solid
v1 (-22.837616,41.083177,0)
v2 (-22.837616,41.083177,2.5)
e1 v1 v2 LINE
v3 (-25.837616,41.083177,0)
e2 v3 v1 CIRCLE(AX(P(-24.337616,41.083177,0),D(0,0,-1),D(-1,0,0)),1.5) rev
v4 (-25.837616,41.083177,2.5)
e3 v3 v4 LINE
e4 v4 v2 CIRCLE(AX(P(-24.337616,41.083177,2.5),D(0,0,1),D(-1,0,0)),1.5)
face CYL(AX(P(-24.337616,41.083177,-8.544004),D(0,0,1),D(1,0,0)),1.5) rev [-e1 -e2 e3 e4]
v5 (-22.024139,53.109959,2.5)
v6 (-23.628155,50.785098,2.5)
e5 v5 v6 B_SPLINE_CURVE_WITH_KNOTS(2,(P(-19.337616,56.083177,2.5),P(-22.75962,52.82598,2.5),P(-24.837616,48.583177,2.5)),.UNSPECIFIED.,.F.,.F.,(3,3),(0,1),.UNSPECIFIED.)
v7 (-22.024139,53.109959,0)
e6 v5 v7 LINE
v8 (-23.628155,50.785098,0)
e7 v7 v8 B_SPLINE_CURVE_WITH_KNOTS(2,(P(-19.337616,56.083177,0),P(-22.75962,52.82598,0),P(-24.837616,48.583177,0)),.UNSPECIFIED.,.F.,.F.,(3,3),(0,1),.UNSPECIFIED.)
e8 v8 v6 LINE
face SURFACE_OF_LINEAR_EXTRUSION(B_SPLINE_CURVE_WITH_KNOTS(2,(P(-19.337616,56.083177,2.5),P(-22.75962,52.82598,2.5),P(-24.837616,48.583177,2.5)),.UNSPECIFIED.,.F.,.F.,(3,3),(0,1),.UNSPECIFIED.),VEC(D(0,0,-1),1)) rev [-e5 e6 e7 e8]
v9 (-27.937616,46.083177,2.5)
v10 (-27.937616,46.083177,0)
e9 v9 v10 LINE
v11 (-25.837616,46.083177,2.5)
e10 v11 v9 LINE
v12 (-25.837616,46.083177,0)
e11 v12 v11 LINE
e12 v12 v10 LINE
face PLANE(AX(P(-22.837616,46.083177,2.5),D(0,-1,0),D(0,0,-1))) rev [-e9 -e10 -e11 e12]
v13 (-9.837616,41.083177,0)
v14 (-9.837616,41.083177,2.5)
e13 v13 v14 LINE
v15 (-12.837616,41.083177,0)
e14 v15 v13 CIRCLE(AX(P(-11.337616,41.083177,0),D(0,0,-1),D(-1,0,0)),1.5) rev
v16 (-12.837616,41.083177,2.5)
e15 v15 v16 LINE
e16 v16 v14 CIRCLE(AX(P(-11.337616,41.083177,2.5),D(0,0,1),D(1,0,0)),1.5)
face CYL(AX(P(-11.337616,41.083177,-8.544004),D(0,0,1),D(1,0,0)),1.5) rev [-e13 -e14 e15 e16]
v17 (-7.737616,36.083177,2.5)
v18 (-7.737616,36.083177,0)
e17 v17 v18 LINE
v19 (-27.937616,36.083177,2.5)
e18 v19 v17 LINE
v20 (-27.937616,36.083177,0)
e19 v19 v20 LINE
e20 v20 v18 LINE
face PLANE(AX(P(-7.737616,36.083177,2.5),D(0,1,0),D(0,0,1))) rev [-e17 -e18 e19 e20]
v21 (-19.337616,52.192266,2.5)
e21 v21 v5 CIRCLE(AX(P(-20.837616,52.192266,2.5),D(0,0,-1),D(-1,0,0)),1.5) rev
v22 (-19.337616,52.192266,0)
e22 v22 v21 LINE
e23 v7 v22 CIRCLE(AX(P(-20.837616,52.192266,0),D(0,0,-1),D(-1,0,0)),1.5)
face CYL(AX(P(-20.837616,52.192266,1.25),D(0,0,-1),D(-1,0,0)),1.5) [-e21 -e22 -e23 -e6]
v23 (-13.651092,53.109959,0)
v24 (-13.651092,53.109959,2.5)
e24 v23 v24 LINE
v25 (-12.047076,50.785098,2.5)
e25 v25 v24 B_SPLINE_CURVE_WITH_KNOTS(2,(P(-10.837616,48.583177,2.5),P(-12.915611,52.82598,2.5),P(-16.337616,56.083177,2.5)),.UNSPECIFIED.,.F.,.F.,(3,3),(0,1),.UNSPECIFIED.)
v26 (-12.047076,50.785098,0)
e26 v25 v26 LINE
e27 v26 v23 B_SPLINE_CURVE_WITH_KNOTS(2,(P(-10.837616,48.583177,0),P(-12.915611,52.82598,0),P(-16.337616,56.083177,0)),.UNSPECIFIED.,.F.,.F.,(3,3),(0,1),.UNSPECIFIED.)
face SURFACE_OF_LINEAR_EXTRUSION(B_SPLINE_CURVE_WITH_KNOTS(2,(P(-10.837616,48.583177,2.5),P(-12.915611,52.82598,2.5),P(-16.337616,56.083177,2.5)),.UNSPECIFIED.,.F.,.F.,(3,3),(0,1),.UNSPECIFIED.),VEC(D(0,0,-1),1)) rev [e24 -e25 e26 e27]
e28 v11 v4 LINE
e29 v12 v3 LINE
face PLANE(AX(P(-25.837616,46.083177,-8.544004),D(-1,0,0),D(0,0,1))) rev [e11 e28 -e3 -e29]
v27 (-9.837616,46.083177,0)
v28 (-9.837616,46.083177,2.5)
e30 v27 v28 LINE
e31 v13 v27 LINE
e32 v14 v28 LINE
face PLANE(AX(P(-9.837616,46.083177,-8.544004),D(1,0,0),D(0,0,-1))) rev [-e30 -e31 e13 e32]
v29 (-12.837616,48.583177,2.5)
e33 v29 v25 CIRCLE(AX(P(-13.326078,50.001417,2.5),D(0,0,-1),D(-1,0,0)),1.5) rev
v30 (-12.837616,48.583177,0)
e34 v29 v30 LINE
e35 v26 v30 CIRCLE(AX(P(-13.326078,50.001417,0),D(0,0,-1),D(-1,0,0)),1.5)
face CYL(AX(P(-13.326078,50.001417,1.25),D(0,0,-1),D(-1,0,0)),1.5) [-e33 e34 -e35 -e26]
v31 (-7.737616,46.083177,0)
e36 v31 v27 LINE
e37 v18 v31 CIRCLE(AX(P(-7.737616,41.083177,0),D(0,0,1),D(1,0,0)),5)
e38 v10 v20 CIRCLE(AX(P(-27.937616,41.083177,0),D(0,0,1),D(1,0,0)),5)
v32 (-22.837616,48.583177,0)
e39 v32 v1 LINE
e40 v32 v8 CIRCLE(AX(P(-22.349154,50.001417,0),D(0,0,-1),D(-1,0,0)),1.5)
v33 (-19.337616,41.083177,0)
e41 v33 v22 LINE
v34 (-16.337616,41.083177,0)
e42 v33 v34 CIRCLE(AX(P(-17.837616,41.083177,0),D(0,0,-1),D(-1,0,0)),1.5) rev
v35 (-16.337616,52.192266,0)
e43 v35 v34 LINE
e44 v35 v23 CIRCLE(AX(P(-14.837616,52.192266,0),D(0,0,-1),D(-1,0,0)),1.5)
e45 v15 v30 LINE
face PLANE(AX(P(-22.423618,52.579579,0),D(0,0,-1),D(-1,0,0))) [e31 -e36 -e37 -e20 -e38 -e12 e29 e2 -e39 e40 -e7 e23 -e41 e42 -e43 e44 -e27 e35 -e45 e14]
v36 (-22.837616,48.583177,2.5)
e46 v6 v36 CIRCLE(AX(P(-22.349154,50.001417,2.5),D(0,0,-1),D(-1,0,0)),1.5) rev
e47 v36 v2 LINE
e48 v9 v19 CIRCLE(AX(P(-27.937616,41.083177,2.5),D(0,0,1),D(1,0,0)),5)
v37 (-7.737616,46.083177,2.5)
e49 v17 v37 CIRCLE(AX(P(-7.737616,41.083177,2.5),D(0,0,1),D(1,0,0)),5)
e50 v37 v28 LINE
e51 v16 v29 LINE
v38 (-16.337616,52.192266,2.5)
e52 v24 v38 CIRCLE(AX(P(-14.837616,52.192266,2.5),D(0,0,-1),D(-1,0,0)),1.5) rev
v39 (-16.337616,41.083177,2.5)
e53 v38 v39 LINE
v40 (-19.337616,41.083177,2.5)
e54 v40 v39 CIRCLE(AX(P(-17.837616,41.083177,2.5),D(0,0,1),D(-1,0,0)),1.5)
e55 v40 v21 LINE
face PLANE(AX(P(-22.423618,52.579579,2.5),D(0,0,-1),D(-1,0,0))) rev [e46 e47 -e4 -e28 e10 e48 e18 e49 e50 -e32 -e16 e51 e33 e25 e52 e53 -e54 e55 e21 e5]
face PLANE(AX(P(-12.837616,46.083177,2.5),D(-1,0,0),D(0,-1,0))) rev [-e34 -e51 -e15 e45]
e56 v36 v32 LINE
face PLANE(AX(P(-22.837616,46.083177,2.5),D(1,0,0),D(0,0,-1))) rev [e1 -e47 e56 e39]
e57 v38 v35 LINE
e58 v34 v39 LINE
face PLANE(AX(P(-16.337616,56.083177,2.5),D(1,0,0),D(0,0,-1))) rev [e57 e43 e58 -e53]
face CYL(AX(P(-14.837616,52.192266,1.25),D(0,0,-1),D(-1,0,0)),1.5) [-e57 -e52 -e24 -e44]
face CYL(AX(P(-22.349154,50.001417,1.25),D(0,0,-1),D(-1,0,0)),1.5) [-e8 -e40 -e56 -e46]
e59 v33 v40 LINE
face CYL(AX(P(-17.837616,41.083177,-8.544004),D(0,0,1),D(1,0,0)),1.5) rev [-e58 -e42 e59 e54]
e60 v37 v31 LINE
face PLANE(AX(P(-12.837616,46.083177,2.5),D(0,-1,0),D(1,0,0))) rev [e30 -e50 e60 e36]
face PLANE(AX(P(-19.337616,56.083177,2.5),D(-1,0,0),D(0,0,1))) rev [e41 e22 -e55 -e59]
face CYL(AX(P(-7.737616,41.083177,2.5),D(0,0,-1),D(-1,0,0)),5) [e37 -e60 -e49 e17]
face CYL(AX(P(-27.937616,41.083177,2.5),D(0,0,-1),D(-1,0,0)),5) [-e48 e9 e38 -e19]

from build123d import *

# Parameters (mm, degrees)
BOSS_EXTRUDE1_DEPTH = 2.5
CUT_EXTRUDE1_START  = -2.5
CUT_EXTRUDE1_DEPTH  = 2.5
FILLET1_R           = 1.5
FILLET2_R           = 1.5


with BuildPart() as part:
    # Sketch1 → Boss-Extrude1 (new body)
    with BuildSketch(Plane.XY):
        with BuildLine():
            Line((-22.837615564, 46.083177434), (-27.937615564, 46.083177434))
            ThreePointArc((-27.937615564, 46.083177434), (-32.937615564, 41.083177434), (-27.937615564, 36.083177434))
            Line((-27.937615564, 36.083177434), (-7.737615564, 36.083177434))
            ThreePointArc((-7.737615564, 36.083177434), (-2.737615564, 41.083177434), (-7.737615564, 46.083177434))
            Line((-7.737615564, 46.083177434), (-12.837615564, 46.083177434))
            Line((-12.837615564, 46.083177434), (-12.837615564, 48.583177434))
            Line((-12.837615564, 48.583177434), (-10.837615564, 48.583177434))
            add(Edge.make_bspline(
                [(-16.337615564, 56.083177434), (-12.915611401, 52.825980487), (-10.837615564, 48.583177434)],
                knots=[0, 0, 0, 1, 1, 1], degree=2))
            Line((-16.337615564, 56.083177434), (-16.337615564, 46.083177434))
            ThreePointArc((-16.337615564, 46.083177434), (-17.837615564, 44.583177434), (-19.337615564, 46.083177434))
            Line((-19.337615564, 46.083177434), (-19.337615564, 56.083177434))
            add(Edge.make_bspline(
                [(-19.337615564, 56.083177434), (-22.759619727, 52.825980487), (-24.837615564, 48.583177434)],
                knots=[0, 0, 0, 1, 1, 1], degree=2))
            Line((-24.837615564, 48.583177434), (-22.837615564, 48.583177434))
            Line((-22.837615564, 48.583177434), (-22.837615564, 46.083177434))
        make_face()
    extrude(amount=BOSS_EXTRUDE1_DEPTH)

    # Sketch2 → Cut-Extrude1 (cut)
    with BuildSketch(Plane.XY.offset(2.5).offset(CUT_EXTRUDE1_START)):
        with BuildLine():
            Line((-9.837615564, 46.083177434), (-9.837615564, 41.083177434))
            ThreePointArc((-9.837615564, 41.083177434), (-11.337615564, 39.583177434), (-12.837615564, 41.083177434))
            Line((-12.837615564, 41.083177434), (-12.837615564, 46.083177434))
            ThreePointArc((-12.837615564, 46.083177434), (-11.337615564, 47.583177434), (-9.837615564, 46.083177434))
        make_face()
        with BuildLine():
            Line((-25.837615564, 46.083177434), (-25.837615564, 41.083177434))
            ThreePointArc((-25.837615564, 41.083177434), (-24.337615564, 39.583177434), (-22.837615564, 41.083177434))
            Line((-22.837615564, 41.083177434), (-22.837615564, 46.083177434))
            ThreePointArc((-22.837615564, 46.083177434), (-24.337615564, 47.583177434), (-25.837615564, 46.083177434))
        make_face()
        with BuildLine():
            Line((-19.337615564, 46.083177434), (-19.337615564, 41.083177434))
            ThreePointArc((-19.337615564, 41.083177434), (-17.837615564, 39.583177434), (-16.337615564, 41.083177434))
            Line((-16.337615564, 41.083177434), (-16.337615564, 46.083177434))
            ThreePointArc((-16.337615564, 46.083177434), (-17.837615564, 47.583177434), (-19.337615564, 46.083177434))
        make_face()
    extrude(amount=CUT_EXTRUDE1_DEPTH, mode=Mode.SUBTRACT)

    # Fillet1
    # the kernel refuses this fillet: 1.5 mm, written as the material it takes off along each edge
    with BuildSketch(Plane(origin=(-10.837615564, 48.583177434, -6.280550784), x_dir=(-1, 0, 0), z_dir=(0, 0, 1))) as fillet1_piece_1:
        with BuildLine():
            CenterArc((2.488462024, -1.418240054), FILLET1_R, 109.004435481, 102.492563124)
            Line((1.209460724, -2.201920903), (1.183880698, -2.21759452))
            ThreePointArc((1.183880698, -2.21759452), (0.552459457, -1.12966162), (-0.026942162, -0.013195451))
            Line((-0.026942162, -0.013195451), (0, 0.03))
            ThreePointArc((0, 0.03), (1, 0.03), (1.99023076, 0.028364801))
            Line((1.99023076, 0.028364801), (2, 0))
        make_face()
    extrude(amount=15.061101567, mode=Mode.SUBTRACT)
    with BuildSketch(Plane(origin=(-24.837615564, 48.583177434, -6.280550784), x_dir=(1, 0, 0), z_dir=(0, 0, 1))) as fillet1_piece_2:
        with BuildLine():
            CenterArc((2.488462024, 1.418240054), FILLET1_R, 148.503001395, 102.492563124)
            Line((1.209460724, 2.201920903), (1.183880698, 2.21759452))
            ThreePointArc((1.183880698, 2.21759452), (0.552459457, 1.12966162), (-0.026942162, 0.013195451))
            Line((-0.026942162, 0.013195451), (0, -0.03))
            ThreePointArc((0, -0.03), (1, -0.03), (1.99023076, -0.028364801))
            Line((1.99023076, -0.028364801), (2, 0))
        make_face()
    extrude(amount=15.061101567, mode=Mode.SUBTRACT)

    # Fillet2
    fillet2_edges = [part.edges().sort_by_distance(p)[0] for p in [
        (-16.337615564, 56.083177434, 1.25),
        (-19.337615564, 56.083177434, 1.25),
    ]]
    fillet(fillet2_edges, radius=FILLET2_R)


solid = part.part
